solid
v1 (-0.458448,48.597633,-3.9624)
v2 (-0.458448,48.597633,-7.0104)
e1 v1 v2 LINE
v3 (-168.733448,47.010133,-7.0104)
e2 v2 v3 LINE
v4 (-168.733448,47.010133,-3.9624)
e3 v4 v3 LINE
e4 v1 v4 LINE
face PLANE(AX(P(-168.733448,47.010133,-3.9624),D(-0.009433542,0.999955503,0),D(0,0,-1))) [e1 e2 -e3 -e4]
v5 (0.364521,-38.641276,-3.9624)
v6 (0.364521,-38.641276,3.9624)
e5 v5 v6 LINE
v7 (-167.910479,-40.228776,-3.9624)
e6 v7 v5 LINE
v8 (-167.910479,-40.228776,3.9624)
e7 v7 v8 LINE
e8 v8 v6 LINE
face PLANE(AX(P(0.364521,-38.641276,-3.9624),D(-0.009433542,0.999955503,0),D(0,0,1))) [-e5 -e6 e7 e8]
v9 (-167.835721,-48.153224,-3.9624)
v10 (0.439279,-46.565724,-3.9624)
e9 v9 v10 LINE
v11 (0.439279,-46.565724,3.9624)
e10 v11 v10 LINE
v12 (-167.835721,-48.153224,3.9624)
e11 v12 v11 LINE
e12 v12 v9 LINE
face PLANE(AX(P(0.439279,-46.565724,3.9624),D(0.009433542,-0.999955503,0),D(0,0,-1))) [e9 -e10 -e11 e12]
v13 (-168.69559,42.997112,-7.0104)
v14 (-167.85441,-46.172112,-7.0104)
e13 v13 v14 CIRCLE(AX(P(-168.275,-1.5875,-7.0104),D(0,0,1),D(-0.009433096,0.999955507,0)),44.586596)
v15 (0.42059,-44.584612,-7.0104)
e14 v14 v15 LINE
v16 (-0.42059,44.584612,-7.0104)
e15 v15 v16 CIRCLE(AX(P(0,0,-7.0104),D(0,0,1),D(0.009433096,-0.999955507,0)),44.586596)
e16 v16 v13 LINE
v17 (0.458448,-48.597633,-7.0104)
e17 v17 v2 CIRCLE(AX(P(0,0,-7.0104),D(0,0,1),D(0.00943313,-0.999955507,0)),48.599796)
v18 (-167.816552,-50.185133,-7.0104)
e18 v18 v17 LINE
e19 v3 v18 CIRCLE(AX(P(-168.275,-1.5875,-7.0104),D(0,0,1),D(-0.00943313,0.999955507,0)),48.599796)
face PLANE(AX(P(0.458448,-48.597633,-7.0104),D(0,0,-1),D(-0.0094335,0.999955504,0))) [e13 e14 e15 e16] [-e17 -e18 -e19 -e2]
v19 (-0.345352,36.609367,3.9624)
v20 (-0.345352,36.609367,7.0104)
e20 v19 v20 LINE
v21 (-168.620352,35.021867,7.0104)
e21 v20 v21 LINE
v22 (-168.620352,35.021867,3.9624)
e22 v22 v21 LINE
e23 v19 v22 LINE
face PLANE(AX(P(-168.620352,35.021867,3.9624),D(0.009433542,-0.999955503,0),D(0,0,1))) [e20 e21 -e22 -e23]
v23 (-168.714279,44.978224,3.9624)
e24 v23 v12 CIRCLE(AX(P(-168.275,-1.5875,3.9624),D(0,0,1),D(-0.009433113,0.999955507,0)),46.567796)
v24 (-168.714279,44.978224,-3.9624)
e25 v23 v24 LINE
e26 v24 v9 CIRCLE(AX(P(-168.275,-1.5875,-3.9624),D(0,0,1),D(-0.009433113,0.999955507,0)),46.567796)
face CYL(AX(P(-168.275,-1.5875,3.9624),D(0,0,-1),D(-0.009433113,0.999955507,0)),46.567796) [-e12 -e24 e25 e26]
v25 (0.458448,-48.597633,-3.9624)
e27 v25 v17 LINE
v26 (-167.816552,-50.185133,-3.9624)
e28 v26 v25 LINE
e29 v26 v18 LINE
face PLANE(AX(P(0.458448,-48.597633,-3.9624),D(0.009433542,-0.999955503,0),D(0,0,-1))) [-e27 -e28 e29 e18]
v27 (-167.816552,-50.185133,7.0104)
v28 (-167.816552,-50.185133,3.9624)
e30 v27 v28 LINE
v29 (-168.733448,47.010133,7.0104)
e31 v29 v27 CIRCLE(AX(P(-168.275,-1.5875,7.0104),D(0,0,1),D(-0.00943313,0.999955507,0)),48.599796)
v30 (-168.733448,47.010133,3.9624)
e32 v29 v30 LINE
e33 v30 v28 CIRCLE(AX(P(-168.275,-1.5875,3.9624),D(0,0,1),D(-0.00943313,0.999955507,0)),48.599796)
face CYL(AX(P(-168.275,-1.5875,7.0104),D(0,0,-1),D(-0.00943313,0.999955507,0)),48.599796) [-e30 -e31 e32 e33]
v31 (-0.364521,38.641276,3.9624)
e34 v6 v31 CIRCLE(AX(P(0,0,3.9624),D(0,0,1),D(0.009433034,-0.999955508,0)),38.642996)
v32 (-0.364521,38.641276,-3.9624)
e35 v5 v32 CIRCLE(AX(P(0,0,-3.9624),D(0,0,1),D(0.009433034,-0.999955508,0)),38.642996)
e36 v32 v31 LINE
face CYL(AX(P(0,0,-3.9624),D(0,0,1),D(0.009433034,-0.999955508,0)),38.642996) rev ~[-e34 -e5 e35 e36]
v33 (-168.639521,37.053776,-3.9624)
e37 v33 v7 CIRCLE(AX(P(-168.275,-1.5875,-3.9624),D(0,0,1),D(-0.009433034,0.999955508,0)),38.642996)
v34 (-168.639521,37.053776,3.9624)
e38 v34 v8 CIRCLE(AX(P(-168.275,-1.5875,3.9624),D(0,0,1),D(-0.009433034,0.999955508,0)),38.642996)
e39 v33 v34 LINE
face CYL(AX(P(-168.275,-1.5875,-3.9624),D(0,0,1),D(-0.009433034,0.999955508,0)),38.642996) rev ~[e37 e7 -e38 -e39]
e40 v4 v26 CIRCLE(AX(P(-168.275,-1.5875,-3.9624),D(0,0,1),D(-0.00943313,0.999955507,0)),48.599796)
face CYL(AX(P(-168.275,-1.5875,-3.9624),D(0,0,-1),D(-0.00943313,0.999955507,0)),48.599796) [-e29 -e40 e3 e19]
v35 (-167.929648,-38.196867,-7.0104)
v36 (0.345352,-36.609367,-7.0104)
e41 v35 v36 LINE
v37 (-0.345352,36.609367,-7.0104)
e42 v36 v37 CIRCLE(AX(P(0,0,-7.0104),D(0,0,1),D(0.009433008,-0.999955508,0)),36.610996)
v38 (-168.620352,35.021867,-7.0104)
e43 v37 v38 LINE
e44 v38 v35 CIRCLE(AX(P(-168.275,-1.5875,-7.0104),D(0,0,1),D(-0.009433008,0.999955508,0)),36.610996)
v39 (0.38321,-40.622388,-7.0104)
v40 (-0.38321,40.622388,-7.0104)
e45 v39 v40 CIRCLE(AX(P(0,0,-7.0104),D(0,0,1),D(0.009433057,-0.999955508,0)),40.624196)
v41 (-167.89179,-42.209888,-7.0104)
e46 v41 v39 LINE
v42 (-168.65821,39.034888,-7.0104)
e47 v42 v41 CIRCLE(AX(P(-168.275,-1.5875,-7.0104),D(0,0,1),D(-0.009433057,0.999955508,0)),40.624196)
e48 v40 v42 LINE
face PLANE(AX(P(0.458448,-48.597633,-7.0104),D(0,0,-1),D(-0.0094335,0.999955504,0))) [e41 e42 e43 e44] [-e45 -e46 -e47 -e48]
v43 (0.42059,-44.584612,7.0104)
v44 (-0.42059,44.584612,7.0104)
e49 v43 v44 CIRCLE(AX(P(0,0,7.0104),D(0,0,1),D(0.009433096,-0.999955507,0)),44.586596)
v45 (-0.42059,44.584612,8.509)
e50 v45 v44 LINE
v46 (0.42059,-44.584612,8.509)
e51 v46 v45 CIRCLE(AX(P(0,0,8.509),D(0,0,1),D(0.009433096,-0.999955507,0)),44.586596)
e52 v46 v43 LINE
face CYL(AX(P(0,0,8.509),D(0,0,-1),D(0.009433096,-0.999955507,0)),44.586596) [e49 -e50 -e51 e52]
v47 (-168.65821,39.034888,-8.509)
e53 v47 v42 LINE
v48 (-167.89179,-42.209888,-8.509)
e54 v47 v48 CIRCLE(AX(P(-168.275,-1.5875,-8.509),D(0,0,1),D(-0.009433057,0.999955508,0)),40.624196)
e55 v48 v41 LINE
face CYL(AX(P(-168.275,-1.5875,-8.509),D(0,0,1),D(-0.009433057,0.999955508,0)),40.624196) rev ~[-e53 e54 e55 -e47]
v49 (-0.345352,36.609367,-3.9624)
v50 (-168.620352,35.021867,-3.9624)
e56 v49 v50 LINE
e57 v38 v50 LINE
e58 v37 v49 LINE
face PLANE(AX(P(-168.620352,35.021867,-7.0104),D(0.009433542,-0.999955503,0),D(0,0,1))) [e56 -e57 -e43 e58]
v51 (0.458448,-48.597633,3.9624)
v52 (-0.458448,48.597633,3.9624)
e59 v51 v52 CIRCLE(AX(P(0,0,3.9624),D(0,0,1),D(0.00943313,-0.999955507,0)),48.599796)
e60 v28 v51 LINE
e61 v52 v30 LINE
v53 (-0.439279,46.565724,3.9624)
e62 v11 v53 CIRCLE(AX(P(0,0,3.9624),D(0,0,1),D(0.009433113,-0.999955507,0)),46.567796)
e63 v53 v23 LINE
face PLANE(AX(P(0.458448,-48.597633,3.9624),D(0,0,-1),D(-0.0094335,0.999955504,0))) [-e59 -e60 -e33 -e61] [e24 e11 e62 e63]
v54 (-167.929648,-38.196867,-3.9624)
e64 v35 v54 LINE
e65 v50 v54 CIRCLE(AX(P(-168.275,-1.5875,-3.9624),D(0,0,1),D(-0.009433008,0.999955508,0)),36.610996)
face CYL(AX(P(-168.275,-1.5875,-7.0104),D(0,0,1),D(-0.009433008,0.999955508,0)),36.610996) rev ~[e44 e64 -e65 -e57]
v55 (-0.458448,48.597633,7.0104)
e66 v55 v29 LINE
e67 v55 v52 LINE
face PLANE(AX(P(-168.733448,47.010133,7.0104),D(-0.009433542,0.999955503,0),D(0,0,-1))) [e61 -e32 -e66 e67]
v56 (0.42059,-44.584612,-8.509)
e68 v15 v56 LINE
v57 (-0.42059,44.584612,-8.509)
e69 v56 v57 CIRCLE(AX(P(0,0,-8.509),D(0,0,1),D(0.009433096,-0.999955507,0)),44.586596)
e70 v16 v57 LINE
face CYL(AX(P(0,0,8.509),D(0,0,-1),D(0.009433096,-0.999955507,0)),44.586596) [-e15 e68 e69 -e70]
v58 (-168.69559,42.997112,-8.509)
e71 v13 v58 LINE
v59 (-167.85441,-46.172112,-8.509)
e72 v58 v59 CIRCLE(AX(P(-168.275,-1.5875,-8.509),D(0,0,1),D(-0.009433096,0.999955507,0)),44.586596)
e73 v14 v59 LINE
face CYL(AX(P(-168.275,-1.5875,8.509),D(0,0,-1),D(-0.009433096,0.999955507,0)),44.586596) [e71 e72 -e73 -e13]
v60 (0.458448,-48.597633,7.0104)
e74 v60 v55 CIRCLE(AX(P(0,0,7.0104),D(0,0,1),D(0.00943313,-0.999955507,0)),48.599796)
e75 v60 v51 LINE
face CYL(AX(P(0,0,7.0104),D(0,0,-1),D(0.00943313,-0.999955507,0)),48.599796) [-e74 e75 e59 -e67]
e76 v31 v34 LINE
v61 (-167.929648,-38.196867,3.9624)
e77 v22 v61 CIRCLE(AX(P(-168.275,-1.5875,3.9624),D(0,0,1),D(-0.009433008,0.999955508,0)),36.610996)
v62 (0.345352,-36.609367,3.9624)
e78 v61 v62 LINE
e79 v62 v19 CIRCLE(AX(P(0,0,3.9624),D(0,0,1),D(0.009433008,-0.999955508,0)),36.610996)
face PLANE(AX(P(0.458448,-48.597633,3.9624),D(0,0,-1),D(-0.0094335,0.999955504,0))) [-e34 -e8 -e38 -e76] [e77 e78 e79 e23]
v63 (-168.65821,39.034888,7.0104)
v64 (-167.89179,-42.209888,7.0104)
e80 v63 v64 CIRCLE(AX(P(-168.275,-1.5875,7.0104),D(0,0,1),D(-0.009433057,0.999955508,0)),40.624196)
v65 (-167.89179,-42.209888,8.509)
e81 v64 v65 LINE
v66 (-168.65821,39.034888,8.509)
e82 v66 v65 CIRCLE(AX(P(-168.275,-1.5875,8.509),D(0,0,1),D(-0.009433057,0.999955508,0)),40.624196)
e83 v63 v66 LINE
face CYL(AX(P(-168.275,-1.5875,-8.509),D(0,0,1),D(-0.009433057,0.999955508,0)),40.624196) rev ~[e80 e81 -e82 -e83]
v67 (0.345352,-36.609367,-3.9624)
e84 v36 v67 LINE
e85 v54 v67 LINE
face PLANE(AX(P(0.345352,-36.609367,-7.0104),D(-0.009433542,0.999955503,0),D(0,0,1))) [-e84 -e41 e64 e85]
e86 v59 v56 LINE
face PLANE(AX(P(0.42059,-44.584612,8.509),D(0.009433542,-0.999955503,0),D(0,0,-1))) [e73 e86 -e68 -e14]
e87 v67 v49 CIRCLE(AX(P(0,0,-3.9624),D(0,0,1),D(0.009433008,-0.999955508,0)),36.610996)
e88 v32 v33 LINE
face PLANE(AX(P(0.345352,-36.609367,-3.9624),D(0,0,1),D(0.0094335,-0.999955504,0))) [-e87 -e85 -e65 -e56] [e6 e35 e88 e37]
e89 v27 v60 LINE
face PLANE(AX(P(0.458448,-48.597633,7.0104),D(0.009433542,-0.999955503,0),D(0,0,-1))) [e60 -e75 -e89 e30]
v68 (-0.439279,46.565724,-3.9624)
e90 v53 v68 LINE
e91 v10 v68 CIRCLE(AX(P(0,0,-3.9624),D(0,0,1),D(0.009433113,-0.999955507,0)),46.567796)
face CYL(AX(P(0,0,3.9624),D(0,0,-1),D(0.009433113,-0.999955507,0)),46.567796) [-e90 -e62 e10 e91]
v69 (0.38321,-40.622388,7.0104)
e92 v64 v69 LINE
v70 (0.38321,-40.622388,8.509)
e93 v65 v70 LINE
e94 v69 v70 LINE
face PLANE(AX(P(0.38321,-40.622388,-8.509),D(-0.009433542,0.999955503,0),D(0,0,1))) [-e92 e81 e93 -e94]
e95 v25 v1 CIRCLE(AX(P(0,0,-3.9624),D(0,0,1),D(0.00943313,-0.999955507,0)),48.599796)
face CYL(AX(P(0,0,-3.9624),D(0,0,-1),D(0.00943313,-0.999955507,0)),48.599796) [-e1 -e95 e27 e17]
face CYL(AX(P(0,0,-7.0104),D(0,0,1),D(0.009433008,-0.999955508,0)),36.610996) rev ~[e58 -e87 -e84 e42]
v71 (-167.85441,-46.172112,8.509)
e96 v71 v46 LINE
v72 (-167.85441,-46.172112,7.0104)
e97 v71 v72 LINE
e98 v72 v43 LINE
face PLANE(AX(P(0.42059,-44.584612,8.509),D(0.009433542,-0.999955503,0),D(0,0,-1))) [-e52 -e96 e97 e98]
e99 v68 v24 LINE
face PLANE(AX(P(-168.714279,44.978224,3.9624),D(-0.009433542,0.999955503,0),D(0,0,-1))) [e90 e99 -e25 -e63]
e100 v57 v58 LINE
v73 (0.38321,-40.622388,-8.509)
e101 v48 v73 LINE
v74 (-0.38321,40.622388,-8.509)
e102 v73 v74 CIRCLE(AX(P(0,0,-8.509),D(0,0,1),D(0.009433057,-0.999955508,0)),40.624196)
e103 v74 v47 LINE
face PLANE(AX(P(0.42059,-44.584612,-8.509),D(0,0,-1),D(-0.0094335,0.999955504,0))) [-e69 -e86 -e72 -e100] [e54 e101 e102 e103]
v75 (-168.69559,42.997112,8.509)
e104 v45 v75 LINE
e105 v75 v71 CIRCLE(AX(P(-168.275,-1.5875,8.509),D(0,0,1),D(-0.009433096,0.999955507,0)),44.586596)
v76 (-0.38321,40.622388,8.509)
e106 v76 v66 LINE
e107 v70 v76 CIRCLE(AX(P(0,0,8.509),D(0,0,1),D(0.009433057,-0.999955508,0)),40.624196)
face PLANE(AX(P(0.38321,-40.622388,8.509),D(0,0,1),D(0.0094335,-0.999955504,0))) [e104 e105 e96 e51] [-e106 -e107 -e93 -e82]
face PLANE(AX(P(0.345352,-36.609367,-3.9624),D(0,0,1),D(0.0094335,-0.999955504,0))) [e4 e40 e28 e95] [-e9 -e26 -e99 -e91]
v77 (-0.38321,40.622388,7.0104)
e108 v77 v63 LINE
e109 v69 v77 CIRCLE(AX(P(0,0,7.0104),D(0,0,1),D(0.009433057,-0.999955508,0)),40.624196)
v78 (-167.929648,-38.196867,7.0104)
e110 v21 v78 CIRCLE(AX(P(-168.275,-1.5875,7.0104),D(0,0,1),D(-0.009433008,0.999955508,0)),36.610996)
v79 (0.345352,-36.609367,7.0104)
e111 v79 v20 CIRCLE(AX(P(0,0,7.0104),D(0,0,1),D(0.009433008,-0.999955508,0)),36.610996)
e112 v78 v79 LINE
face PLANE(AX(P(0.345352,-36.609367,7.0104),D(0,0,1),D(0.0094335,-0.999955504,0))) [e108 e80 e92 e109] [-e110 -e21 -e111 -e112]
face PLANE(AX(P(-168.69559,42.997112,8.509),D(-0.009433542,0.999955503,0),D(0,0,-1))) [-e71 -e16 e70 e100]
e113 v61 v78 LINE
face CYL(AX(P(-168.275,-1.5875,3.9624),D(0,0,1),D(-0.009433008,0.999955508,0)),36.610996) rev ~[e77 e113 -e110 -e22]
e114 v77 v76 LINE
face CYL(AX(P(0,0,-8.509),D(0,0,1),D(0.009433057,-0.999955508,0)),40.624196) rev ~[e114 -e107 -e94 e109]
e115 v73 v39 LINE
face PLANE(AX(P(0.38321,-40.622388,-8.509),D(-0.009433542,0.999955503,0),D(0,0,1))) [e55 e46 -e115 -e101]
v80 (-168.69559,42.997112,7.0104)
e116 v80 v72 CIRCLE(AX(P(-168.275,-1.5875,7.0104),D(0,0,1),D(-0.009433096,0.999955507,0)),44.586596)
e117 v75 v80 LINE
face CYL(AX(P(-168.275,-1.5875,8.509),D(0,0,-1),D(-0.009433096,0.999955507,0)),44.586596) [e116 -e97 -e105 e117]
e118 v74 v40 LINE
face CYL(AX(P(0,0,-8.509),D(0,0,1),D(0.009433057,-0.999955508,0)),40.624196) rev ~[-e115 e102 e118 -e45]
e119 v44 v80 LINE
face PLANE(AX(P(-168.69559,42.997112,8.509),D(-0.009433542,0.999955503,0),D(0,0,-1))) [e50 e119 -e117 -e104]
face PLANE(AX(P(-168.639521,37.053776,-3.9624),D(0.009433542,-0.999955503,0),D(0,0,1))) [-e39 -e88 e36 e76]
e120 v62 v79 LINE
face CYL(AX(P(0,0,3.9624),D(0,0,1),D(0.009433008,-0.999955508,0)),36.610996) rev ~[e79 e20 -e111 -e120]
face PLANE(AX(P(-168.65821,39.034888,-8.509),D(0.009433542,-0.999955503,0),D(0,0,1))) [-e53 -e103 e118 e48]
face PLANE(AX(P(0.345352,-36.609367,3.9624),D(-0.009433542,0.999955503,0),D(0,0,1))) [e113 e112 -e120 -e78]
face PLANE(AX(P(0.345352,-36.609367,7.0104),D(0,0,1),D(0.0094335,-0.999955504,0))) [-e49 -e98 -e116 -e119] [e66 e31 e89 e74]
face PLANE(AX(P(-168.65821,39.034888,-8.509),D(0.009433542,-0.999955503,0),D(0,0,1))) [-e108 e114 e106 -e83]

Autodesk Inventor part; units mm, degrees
ref_plane "Work Plane2" through (-168.275, -1.5875, 0) normal (-1, 0, 0) x (0, 0, 1)
ref_plane "Work Plane3" through (0, 0, 0) normal (-0.9749588, 0.2223855, 0) x (0, 0, 1)
sketch "Path" plane through (0, 0, 0) normal (0, 0, 1) x (1, 0, 0)
  arc A0 (-168.6769, 41.016) -> (-167.8731, -44.191) centre (-168.275, -1.5875) ccw
  arc A1 (0.4019, -42.6035) -> (-0.4019, 42.6035) centre (0, 0) ccw
  line L0 (0.4019, -42.6035) -> (-167.8731, -44.191)
  line L1 (-168.6769, 41.016) -> (-0.4019, 42.6035)
  dimension "d31" = 11.9888
ref_plane "Section Plane" through (-167.8731, -44.191, 0) normal (0.9999555, 0.0094335, 0) x (0, 0, 1)
sketch "Section Sketch" plane through (-167.8731, -44.191, 0) normal (0.9999555, 0.0094335, 0) x (0, 0, 1)
  line L0 (-8.509, -1.9812) -> (8.509, -1.9812)
  line L1 (8.509, -1.9812) -> (8.509, 1.9812)
  line L2 (8.509, 1.9812) -> (-8.509, 1.9812)
  line L3 (-8.509, 1.9812) -> (-8.509, -1.9812)
  line L4 (-3.9624, -3.9624) -> (3.9624, -3.9624)
  line L5 (3.9624, -3.9624) -> (3.9624, 3.9624)
  line L6 (3.9624, 3.9624) -> (-3.9624, 3.9624)
  line L7 (-3.9624, 3.9624) -> (-3.9624, -3.9624)
  line L8 (-3.9624, 0) -> (3.9624, 0) construction
  line L9 (-7.0104, -5.9944) -> (-3.9624, -5.9944)
  line L10 (-3.9624, -5.9944) -> (-3.9624, 5.9944)
  line L11 (-3.9624, 5.9944) -> (-7.0104, 5.9944)
  line L12 (-7.0104, 5.9944) -> (-7.0104, -5.9944)
  line L13 (3.9624, -5.9944) -> (7.0104, -5.9944)
  line L14 (7.0104, -5.9944) -> (7.0104, 5.9944)
  line L15 (7.0104, 5.9944) -> (3.9624, 5.9944)
  line L16 (3.9624, 5.9944) -> (3.9624, -5.9944)
  line L17 (-8.509, 0) -> (8.509, 0) construction
  point P0 (0, 0)
  point P1 (0, 0)
  dimension "d21" = 3.9624
  dimension "d22" = 7.9248
  dimension "d23" = 7.9248
  dimension "d24" = 3.048
  dimension "d31" = 11.9888
  dimension "d32" = 17.018
sweep "Solid" add profiles "Section Sketch" path "Path"
pattern_of_one "Strand Pattern"
equation "\"d21\" = da_d2"
equation "\"d22\" = da_d1"
equation "\"d23\" = da_b1"
equation "\"d24\" = da_t1 + da_t2"
equation "\"d30\" = da_pt"
equation "\"da_p\" = 12.7"
equation "\"da_b1\" = 7.9248"
equation "\"da_h2\" = 11.9888"
equation "\"da_h3\" = 10.3886"
equation "\"da_d1\" = 7.9248"
equation "\"da_d2\" = 3.9624"
equation "\"da_pt\" = 14.3764"
equation "\"da_b\" = 17.018"
equation "\"da_t1\" = 1.524"
equation "\"da_t2\" = 1.524"
properties part number "Roller Chain"
